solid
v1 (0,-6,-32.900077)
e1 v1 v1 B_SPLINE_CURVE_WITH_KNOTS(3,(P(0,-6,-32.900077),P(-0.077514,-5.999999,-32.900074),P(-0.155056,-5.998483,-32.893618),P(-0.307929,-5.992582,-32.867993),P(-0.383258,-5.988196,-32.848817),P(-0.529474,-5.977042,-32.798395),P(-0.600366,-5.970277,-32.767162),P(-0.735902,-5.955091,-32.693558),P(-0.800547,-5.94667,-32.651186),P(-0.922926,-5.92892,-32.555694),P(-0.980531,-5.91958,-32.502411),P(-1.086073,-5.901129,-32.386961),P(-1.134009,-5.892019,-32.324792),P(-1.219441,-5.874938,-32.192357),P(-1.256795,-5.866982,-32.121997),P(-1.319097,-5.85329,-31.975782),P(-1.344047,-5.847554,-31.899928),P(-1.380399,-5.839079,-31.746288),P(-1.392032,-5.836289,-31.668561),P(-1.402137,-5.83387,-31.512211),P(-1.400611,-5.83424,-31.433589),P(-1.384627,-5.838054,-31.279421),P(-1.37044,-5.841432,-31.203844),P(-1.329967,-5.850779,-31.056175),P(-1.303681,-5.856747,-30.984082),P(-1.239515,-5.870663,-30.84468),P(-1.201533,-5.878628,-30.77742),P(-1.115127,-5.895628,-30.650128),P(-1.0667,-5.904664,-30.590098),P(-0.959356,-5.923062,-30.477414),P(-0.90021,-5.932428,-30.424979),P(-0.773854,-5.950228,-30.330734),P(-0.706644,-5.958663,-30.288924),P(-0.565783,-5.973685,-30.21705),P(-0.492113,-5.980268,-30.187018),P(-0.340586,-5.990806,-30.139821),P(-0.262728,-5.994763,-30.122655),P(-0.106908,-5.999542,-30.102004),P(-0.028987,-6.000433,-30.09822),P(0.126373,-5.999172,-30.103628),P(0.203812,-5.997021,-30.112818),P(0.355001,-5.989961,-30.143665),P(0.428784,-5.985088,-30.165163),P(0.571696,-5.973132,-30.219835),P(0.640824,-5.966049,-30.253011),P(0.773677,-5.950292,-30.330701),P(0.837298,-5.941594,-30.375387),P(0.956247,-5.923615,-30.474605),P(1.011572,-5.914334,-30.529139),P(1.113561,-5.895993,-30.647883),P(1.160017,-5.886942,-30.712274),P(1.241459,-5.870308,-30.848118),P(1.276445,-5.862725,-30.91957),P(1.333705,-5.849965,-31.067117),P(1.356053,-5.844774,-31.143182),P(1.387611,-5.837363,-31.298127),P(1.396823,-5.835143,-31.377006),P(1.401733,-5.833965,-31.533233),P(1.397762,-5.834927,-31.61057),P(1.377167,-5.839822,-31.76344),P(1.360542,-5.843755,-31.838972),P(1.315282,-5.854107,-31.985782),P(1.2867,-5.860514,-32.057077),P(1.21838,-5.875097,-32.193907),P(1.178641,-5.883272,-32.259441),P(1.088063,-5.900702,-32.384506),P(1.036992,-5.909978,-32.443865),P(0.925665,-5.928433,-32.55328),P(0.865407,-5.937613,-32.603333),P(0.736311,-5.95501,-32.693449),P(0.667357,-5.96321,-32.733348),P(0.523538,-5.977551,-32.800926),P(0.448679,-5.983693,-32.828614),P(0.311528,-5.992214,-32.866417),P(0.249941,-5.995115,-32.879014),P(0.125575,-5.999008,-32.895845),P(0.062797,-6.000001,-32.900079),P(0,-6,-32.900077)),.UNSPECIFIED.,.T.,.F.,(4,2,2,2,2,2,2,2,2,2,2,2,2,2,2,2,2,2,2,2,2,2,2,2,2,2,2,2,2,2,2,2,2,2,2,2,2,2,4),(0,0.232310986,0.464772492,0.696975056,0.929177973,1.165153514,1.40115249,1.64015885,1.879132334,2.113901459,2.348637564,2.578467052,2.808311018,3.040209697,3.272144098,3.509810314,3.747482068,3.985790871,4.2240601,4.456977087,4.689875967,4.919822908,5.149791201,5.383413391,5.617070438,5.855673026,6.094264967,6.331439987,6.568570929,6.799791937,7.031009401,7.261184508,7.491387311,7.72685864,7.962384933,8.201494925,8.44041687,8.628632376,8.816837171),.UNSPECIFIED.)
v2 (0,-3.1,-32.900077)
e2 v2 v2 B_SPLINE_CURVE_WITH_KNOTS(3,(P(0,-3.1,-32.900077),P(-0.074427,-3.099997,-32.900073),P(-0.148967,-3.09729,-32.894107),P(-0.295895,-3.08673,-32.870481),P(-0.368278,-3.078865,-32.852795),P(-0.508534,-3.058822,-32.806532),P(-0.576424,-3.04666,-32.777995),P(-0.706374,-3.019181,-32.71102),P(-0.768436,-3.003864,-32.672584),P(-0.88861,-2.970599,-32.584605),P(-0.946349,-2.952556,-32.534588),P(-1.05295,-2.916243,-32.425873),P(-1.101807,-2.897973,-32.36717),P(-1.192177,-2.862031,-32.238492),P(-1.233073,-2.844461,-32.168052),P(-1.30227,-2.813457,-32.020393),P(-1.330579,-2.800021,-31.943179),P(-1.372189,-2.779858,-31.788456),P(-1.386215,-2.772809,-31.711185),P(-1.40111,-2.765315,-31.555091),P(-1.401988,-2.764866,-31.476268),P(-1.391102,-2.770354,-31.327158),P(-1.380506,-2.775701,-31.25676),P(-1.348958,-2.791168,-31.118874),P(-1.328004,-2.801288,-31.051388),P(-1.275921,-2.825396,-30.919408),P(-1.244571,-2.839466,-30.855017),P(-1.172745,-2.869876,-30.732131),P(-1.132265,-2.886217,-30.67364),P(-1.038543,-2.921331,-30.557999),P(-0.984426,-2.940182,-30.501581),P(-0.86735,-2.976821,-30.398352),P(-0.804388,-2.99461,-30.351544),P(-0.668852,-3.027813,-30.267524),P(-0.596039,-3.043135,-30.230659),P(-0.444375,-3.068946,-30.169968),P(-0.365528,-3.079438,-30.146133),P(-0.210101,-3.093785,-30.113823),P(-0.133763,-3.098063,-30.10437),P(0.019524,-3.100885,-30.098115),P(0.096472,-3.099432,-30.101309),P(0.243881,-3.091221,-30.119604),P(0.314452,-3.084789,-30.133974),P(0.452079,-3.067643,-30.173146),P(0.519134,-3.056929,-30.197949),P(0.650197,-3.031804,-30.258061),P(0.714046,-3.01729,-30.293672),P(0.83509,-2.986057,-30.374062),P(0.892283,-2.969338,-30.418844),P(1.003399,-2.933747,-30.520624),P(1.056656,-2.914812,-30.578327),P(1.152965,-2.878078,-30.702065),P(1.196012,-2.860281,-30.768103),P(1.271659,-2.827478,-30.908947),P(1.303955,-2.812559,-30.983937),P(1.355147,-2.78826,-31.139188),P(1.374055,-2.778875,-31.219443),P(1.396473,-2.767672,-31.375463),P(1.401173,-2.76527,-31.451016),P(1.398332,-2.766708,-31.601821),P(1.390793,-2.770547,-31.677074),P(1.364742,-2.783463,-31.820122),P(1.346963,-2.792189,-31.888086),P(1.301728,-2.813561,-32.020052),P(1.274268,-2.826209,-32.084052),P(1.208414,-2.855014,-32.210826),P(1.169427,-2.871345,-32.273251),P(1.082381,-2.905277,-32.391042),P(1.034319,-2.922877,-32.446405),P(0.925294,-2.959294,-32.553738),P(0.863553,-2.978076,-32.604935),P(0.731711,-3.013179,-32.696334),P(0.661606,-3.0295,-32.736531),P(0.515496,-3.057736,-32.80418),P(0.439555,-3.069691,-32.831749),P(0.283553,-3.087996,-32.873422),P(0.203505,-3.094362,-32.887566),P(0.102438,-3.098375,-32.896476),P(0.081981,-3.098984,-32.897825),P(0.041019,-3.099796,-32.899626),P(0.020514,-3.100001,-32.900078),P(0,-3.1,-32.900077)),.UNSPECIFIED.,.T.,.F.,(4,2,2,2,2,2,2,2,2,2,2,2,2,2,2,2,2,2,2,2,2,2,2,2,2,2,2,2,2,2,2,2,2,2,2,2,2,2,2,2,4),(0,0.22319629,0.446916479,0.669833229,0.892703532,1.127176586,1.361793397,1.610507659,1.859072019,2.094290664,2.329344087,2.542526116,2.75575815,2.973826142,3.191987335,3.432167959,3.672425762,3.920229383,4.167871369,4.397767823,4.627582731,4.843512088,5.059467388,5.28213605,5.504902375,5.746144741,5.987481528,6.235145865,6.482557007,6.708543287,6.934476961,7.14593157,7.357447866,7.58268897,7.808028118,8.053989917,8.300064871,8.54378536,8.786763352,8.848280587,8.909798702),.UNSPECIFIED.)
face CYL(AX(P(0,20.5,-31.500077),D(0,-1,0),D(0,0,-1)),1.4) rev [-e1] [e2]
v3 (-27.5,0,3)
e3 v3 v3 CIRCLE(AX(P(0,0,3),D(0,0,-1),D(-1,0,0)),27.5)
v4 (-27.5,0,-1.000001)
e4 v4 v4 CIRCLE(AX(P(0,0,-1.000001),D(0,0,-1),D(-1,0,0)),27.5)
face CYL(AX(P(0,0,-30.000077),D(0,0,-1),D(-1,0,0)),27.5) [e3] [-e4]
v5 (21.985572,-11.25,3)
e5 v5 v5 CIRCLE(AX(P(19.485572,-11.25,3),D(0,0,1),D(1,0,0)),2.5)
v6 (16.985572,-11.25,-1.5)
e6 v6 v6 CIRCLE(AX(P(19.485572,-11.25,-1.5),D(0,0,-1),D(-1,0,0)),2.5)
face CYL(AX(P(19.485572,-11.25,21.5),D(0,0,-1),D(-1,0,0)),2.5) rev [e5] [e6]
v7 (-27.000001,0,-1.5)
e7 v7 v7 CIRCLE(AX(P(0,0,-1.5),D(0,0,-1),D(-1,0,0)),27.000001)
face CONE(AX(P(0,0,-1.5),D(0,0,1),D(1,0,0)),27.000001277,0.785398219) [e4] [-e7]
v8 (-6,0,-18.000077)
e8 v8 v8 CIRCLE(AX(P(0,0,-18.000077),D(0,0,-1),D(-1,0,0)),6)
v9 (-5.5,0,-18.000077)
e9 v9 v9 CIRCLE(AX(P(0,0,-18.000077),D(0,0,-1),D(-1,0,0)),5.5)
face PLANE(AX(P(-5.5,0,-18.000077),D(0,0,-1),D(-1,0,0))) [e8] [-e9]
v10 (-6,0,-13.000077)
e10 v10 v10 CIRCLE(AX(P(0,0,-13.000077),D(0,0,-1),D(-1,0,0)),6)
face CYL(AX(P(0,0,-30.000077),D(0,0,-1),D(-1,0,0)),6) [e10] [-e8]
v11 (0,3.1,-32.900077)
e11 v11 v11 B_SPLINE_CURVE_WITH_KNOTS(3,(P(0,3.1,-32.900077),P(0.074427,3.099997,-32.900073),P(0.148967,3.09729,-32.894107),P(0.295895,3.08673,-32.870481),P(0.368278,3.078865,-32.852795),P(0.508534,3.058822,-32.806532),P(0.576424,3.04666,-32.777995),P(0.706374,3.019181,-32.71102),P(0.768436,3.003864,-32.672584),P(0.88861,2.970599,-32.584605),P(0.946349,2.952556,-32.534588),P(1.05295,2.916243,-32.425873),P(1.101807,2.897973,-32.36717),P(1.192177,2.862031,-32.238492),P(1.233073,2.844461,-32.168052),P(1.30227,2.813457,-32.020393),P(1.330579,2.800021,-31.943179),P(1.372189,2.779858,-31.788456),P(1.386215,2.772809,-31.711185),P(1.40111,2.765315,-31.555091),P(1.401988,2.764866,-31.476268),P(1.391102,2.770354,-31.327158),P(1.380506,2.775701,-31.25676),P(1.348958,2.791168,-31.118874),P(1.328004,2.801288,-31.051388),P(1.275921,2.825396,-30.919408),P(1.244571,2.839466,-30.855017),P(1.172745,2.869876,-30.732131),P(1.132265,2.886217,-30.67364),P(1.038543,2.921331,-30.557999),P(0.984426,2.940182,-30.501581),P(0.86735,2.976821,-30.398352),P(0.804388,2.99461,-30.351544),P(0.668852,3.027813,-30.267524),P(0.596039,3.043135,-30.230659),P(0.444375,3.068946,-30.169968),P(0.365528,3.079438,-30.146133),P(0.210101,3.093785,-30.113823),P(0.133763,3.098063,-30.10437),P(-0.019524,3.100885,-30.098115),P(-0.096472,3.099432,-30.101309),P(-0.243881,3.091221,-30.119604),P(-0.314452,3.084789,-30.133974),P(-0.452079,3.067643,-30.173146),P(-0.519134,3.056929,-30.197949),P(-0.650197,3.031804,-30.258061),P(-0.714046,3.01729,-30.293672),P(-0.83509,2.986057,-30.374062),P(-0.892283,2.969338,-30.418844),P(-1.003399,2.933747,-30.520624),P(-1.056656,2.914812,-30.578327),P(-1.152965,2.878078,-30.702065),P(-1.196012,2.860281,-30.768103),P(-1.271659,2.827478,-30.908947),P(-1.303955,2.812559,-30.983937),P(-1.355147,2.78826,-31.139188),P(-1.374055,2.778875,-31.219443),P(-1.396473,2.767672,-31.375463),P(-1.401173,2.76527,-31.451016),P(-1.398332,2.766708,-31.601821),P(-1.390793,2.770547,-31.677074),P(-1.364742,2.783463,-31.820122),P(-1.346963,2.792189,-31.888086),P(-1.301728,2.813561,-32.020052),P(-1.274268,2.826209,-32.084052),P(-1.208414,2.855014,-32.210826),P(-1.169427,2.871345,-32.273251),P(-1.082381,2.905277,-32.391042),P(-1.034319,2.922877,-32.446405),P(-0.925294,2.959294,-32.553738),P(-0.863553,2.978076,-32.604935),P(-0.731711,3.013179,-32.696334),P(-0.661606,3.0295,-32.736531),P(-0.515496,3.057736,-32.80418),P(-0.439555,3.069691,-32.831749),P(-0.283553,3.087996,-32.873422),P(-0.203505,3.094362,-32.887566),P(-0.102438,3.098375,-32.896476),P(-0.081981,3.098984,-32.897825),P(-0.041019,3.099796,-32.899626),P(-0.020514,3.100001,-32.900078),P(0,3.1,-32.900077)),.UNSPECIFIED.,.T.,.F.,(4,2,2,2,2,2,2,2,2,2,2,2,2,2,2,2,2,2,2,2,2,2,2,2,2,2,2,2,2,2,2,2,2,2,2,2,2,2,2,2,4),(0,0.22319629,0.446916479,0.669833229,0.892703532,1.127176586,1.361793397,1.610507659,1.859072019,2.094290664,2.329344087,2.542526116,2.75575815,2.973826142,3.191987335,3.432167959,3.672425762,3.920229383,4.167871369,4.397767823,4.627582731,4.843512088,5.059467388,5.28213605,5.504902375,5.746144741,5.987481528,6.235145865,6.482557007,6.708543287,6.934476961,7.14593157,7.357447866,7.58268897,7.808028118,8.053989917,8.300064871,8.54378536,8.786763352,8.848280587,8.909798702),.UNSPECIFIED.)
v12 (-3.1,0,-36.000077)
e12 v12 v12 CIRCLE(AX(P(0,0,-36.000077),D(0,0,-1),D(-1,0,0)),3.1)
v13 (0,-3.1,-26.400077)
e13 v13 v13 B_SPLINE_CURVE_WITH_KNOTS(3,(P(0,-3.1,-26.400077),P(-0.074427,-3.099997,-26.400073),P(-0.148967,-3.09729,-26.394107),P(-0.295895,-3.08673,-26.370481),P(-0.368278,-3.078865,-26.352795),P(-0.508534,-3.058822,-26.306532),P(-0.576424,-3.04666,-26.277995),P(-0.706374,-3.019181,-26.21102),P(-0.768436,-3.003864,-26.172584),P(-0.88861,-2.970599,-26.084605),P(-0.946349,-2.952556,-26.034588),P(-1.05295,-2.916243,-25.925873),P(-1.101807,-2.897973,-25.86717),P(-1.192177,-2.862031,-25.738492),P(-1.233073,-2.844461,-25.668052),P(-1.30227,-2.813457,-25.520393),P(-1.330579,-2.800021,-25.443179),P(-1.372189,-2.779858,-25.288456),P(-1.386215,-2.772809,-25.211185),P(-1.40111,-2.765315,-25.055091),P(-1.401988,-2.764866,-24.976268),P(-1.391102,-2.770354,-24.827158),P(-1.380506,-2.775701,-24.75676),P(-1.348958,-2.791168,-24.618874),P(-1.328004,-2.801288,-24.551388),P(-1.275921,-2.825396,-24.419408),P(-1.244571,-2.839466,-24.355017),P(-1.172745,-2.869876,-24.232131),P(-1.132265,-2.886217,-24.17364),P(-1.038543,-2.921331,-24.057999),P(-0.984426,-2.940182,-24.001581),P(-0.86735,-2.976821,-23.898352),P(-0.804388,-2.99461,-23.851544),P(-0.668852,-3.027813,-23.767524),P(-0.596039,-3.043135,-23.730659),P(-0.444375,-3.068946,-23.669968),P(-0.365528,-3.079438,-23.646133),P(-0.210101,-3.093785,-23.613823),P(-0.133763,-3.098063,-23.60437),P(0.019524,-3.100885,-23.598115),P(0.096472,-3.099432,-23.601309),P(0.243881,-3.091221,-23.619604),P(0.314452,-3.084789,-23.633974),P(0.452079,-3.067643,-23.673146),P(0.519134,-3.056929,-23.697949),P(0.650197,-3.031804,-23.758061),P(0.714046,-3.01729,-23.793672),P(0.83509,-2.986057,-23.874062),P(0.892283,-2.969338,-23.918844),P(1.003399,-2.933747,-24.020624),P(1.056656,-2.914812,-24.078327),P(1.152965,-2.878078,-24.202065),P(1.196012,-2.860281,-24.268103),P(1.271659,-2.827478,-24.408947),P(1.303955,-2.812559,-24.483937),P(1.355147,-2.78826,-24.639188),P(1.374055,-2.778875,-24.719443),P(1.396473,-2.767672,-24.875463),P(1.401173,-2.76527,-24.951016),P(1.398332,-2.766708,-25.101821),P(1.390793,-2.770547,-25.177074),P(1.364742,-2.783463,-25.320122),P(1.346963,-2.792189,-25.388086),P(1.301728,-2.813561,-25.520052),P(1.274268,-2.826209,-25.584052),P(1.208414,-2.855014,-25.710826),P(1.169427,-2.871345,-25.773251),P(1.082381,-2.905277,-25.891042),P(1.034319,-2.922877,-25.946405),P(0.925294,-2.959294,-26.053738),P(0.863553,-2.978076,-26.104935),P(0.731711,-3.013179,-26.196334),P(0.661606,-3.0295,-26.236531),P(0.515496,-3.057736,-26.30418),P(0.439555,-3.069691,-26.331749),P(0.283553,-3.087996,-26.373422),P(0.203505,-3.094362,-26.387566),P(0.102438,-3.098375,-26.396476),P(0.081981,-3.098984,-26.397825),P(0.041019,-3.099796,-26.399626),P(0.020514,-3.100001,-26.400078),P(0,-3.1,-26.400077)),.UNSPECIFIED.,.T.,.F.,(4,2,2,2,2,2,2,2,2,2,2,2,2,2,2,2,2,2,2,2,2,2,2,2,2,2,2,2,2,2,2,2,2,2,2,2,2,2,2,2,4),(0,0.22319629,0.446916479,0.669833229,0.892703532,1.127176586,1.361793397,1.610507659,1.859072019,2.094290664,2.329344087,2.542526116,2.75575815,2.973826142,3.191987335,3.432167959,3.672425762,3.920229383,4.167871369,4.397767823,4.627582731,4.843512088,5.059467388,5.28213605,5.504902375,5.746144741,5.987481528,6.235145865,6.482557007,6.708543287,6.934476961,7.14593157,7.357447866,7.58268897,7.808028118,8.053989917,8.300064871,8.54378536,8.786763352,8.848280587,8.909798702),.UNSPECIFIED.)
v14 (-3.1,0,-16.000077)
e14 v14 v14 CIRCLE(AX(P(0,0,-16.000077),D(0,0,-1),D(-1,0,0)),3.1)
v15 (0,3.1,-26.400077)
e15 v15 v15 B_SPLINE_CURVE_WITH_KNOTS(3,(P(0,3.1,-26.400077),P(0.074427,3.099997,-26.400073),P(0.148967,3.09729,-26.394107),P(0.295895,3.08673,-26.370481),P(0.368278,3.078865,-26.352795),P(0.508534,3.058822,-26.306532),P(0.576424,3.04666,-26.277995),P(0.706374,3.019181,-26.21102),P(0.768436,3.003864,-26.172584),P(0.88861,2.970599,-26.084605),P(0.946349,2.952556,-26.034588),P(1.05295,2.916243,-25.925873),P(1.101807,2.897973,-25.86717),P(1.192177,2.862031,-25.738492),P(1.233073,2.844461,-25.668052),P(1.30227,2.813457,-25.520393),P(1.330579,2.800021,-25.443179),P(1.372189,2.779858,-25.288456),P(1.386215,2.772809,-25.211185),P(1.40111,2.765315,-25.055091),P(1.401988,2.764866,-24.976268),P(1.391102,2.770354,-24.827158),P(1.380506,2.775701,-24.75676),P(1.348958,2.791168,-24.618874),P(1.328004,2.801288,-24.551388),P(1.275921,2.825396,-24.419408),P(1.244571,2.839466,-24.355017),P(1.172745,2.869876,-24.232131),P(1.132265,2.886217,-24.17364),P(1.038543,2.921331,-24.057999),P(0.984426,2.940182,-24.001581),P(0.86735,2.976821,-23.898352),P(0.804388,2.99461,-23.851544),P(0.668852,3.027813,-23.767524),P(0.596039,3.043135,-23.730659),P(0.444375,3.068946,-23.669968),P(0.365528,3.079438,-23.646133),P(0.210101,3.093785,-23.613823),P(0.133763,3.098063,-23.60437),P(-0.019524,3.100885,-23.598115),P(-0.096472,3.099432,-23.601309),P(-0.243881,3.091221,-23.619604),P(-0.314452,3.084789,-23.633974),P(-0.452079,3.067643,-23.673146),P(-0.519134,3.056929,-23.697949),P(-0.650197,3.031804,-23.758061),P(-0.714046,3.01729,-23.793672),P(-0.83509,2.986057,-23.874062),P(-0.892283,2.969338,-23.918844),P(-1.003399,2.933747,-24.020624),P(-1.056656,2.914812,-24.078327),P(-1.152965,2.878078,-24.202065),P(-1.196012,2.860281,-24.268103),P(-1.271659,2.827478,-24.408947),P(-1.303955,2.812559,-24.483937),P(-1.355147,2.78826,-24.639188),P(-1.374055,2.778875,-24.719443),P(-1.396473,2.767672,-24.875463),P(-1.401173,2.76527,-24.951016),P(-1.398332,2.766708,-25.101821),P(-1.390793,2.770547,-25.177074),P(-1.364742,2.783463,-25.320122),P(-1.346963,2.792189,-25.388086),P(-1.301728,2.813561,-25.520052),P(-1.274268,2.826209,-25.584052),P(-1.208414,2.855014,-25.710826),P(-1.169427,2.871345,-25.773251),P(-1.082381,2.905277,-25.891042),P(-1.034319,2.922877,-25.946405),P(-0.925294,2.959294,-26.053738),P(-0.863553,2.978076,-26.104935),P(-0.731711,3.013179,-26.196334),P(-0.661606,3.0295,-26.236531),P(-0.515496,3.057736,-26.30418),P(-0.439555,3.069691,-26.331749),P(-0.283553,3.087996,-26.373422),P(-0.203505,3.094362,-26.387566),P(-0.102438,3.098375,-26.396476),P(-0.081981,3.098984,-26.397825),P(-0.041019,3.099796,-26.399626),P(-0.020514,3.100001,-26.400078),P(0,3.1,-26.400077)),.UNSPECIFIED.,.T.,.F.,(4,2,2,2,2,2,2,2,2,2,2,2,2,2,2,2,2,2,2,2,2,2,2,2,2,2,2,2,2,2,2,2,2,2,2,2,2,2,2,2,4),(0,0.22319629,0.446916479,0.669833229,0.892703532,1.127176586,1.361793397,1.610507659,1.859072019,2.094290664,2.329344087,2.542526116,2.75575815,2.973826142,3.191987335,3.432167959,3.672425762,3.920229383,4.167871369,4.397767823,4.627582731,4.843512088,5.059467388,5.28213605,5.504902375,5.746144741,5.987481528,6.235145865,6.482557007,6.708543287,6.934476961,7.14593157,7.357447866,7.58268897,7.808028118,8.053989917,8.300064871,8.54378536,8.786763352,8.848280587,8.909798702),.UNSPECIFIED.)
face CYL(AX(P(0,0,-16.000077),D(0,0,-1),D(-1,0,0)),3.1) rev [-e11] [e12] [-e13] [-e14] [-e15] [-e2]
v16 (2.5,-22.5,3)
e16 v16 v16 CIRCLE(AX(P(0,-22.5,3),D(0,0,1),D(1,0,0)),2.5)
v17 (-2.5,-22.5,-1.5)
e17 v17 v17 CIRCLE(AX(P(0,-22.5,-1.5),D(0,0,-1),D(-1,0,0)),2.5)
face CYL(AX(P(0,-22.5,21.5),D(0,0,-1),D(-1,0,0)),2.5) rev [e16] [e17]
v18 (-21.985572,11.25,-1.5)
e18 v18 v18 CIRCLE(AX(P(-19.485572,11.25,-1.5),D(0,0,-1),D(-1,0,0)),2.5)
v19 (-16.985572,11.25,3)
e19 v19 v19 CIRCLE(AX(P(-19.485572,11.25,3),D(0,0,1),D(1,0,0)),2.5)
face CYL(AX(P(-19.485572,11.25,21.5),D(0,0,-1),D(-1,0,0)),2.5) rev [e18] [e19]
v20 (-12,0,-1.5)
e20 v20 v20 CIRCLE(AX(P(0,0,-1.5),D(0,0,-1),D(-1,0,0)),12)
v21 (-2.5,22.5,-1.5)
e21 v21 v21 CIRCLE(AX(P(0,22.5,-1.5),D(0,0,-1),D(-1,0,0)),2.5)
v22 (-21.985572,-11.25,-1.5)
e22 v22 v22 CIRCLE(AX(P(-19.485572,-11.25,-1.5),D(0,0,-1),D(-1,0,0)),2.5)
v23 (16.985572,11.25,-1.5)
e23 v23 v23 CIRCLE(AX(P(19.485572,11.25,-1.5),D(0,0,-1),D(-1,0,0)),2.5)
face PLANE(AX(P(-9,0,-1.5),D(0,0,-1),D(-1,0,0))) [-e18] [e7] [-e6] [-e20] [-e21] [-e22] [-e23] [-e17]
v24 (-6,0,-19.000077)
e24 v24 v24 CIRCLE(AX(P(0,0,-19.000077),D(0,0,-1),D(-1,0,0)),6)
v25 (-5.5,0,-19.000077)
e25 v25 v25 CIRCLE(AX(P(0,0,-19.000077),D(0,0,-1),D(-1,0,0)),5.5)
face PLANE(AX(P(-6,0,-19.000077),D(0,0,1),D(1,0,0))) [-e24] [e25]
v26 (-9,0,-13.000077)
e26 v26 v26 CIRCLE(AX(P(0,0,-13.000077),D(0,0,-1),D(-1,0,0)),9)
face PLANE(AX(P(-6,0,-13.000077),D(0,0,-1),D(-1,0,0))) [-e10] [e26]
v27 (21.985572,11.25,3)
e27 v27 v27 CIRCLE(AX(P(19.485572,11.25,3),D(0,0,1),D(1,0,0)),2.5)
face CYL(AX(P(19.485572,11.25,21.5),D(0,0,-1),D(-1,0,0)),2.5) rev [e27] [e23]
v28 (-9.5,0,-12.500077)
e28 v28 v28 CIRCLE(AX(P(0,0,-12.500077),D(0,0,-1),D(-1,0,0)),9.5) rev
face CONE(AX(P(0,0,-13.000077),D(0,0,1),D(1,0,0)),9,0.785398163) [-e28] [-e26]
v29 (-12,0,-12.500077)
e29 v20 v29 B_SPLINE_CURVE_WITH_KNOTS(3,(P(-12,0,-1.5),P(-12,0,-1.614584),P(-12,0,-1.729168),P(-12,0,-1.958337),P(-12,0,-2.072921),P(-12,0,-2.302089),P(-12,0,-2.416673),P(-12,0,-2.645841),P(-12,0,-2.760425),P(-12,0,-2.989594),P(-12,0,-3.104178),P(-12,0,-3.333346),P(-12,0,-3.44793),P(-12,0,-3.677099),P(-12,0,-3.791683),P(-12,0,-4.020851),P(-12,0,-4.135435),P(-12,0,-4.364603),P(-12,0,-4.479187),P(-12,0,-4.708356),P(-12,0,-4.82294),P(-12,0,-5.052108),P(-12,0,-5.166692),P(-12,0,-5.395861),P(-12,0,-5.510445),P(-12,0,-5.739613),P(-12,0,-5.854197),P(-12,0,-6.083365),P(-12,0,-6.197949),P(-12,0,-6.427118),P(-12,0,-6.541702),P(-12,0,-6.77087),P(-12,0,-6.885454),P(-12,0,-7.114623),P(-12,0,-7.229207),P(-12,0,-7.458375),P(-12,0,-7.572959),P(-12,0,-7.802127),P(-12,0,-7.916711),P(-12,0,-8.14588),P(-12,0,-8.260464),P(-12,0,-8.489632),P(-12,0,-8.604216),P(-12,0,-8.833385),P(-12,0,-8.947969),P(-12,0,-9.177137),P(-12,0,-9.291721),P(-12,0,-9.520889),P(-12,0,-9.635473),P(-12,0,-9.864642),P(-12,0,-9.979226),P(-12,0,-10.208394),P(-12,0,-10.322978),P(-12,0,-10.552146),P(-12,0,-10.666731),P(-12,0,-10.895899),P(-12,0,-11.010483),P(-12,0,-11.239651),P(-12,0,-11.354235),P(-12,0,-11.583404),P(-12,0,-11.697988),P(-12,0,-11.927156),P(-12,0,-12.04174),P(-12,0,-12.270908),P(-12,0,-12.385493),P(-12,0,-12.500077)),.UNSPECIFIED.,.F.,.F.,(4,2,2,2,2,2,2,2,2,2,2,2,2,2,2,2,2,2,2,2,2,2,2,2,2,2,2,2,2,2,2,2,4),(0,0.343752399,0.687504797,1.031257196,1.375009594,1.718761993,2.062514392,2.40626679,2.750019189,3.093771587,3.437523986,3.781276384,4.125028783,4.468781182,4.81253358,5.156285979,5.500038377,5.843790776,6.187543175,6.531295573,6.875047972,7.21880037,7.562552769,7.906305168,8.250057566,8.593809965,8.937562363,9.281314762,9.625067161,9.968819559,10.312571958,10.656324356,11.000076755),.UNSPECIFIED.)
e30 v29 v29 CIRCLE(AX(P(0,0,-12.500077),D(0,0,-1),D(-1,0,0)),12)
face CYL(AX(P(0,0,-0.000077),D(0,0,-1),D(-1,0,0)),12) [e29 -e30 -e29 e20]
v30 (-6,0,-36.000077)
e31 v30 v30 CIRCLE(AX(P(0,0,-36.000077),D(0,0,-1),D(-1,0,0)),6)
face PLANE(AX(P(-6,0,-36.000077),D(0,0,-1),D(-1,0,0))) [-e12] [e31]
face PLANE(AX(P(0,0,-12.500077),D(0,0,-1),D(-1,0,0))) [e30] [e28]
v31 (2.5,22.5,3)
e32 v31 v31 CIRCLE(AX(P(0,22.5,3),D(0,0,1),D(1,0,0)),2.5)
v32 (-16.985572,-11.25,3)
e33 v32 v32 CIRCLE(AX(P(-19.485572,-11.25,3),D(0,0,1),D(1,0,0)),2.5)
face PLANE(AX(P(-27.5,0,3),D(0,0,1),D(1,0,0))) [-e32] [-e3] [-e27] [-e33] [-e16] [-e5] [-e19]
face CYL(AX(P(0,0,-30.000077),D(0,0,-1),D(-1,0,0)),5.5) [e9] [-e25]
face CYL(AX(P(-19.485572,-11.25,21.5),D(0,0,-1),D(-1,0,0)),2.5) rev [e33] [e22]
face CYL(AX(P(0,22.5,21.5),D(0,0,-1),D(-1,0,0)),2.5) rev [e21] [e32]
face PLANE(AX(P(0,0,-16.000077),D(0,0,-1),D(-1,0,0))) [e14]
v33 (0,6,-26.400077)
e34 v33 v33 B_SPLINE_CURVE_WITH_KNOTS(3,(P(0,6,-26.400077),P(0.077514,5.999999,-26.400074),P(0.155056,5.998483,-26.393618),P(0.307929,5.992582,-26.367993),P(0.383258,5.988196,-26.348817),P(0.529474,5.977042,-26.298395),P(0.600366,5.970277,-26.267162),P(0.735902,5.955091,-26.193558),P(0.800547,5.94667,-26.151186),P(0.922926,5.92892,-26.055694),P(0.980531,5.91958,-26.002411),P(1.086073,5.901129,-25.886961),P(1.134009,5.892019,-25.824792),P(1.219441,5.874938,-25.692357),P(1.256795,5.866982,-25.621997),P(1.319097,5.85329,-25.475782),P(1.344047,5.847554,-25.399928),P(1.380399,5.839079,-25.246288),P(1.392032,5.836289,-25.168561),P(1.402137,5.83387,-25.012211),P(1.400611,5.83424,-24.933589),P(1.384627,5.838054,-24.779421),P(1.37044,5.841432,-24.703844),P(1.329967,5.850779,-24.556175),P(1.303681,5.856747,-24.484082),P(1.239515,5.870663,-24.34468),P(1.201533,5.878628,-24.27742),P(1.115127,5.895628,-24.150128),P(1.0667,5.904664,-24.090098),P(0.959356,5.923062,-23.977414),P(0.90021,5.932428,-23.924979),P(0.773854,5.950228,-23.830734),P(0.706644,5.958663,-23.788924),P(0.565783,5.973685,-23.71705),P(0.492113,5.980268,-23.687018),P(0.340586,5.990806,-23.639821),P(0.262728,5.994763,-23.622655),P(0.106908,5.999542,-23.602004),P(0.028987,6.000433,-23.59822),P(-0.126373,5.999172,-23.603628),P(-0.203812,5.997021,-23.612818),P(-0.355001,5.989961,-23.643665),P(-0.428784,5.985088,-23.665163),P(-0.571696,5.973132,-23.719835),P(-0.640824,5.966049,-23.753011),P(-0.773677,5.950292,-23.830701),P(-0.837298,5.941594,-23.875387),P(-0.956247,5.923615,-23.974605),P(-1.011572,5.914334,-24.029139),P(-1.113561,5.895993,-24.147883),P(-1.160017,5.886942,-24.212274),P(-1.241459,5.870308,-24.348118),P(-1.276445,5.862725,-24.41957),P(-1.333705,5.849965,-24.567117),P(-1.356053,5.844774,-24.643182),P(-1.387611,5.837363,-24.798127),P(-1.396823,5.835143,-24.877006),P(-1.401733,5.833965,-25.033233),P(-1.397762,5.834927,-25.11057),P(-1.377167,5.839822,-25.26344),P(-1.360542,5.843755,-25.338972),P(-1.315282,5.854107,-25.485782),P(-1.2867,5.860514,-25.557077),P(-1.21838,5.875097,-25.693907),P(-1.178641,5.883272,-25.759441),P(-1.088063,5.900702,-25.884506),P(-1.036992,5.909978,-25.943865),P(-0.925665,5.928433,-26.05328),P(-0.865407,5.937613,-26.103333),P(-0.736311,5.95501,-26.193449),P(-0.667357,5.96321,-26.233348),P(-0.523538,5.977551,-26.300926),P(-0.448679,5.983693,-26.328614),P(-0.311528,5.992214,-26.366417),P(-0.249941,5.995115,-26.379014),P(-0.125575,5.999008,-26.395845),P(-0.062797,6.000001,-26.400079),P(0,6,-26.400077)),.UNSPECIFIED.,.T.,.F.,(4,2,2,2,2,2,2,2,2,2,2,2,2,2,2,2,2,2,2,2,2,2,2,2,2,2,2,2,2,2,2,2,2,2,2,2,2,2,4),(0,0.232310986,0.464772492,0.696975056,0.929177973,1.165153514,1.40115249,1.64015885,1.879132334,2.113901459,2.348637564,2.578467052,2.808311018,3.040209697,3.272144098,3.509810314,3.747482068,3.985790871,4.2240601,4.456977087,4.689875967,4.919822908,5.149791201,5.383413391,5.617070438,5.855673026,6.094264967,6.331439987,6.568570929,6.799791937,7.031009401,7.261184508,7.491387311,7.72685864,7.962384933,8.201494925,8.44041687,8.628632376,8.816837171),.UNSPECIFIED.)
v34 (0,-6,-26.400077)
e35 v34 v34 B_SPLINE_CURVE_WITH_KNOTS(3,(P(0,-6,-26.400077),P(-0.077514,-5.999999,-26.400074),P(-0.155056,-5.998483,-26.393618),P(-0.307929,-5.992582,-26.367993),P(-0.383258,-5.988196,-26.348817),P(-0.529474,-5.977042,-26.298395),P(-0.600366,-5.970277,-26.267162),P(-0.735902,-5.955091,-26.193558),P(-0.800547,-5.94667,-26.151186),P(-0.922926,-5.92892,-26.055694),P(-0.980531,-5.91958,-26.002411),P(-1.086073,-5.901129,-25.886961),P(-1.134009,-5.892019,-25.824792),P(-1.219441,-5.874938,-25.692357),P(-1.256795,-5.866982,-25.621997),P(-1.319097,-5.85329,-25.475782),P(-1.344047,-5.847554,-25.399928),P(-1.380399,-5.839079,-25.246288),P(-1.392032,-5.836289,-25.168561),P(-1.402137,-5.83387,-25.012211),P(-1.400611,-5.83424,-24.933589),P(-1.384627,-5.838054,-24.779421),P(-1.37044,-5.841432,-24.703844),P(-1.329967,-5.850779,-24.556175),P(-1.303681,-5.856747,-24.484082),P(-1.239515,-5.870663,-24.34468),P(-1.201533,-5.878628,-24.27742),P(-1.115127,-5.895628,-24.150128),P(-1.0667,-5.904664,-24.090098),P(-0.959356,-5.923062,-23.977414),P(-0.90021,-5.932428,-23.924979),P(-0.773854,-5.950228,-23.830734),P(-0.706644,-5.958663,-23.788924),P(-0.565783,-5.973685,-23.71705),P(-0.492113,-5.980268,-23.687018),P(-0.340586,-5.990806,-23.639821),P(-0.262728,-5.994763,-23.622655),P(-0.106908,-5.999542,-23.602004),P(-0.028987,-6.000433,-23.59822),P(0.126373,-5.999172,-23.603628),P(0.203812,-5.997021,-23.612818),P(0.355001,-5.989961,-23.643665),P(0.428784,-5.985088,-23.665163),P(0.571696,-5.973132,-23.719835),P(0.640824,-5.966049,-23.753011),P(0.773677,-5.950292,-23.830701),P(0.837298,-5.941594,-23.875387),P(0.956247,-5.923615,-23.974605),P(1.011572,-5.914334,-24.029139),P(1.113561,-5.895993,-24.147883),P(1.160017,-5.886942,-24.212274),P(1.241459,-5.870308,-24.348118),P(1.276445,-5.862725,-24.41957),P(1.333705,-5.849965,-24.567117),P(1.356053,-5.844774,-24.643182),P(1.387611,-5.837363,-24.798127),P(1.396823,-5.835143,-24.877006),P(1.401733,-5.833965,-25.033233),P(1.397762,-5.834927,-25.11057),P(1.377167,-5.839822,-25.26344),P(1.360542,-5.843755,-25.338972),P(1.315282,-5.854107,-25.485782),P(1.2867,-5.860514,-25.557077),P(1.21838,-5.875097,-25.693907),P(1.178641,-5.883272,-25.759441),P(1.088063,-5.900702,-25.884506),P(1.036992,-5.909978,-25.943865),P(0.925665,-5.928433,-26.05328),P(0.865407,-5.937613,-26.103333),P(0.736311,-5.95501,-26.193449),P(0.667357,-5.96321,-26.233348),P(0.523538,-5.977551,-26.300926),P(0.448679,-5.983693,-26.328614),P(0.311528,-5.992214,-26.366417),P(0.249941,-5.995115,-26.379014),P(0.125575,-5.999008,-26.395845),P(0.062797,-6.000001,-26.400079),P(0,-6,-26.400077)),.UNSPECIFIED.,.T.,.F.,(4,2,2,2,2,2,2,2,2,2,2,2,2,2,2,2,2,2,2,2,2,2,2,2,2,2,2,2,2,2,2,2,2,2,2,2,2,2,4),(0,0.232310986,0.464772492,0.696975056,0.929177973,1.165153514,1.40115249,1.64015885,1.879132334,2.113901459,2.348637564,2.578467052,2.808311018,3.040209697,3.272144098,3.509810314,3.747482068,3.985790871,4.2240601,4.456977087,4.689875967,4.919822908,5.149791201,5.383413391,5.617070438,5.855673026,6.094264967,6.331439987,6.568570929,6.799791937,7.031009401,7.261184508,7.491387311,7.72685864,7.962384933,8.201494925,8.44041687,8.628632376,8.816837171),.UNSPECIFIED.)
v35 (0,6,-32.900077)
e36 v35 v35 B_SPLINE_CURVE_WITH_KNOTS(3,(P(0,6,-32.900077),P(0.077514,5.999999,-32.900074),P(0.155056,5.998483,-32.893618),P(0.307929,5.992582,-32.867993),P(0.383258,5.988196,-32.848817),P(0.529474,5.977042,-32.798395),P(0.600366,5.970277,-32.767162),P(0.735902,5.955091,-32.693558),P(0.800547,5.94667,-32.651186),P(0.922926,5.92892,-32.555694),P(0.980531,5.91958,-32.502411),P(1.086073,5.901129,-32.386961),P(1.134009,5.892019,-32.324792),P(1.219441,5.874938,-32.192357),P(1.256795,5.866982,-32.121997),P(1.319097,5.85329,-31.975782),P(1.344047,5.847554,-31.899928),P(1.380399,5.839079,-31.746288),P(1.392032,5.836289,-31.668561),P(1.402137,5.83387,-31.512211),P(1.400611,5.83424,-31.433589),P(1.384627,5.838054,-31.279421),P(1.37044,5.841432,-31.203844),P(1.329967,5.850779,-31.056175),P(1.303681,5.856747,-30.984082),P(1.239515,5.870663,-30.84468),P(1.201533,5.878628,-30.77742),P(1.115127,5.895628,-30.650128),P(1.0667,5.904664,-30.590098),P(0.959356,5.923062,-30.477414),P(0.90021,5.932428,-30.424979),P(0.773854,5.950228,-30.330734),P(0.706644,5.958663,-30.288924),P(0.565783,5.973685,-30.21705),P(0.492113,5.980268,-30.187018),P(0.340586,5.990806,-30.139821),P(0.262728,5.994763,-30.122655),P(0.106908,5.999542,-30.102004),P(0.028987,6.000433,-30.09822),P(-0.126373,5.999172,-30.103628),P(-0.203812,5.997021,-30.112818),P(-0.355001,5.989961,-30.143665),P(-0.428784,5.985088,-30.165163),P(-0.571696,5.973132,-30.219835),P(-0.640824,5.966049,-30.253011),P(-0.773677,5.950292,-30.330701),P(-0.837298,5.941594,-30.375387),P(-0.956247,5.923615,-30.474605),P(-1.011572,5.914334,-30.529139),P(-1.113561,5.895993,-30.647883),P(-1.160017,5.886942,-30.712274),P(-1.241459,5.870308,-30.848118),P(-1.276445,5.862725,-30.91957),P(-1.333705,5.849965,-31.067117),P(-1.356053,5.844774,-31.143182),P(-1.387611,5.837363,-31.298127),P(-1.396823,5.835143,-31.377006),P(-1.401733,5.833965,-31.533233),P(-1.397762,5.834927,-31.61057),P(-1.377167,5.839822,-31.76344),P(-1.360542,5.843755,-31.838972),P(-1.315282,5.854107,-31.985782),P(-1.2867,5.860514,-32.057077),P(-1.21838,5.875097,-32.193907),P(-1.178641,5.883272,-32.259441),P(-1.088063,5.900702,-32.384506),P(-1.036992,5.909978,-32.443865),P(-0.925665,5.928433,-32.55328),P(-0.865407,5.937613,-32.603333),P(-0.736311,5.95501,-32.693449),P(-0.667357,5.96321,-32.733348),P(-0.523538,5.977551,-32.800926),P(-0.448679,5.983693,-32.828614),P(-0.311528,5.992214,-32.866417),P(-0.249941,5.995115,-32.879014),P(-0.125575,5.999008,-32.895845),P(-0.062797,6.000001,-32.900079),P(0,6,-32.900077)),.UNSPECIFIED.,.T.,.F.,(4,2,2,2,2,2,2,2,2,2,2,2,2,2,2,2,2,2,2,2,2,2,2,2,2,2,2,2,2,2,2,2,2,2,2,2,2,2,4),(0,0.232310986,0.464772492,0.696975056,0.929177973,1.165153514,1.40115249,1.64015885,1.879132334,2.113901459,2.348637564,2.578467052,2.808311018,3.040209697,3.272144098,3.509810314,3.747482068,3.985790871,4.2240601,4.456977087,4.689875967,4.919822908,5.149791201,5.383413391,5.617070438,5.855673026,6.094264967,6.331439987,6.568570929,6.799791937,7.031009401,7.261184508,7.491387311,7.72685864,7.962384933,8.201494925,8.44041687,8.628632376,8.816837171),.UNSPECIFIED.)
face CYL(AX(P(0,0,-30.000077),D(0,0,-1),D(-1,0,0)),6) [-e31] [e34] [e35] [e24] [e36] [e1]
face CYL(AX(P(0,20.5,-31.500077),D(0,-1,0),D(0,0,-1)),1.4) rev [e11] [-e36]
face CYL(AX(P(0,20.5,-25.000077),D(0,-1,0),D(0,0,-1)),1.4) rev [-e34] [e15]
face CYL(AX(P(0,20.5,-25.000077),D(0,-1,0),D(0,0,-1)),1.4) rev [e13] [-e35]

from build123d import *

# Parameters (mm, degrees)
SKETCH_2_R               = 6.5
CUT_EXTRUDE_1_DEPTH      = 28
CHAMFER_1_SIZE           = 0.5
SKETCH_3_R               = 2.5
CUT_EXTRUDE_2_DEPTH      = 23
SKETCH_4_R               = 3.1
CUT_EXTRUDE_3_DEPTH      = 20
SKETCH_5_R               = 16.017465931
CUT_EXTRUDE_4_DEPTH      = 30.8
SKETCH_6_R               = 12
SKETCH_6_R_2             = 9
EXTRUDE_1_DEPTH          = 13
SKETCH_7_R               = 12
SKETCH_7_R_2             = 9
CUT_EXTRUDE_5_DEPTH      = 0.5
CHAMFER_2_SIZE           = 0.5
CUT_EXTRUDE_6_DEPTH      = 20.5
CUT_EXTRUDE_6_DEPTH_BACK = 30.5
SKETCH_8_R               = 1.4


with BuildPart() as part:
    # 草图1 → 旋转1 (revolve)
    with BuildSketch(Plane(origin=(0, 0, 0), x_dir=(1, 0, 0), z_dir=(0, 1, 0))):
        Polygon((-6, 20.000076755), (-6, 36.000076755), (0, 36.000076755), (0, 30.000076755), (0, -33.8), (-9.249924022, -33.8), (-9.75, -33.299919915), (-9.75, -3), (-27.5, -3), (-27.5, 1.000001333), (-27.000001277, 1.5), (-9, 1.5), (-9, 6.5), (-9, 13.000076755), (-6, 13.000076755), (-6, 18.000076755), (-5.5, 18.000076755), (-5.5, 19.000076755), (-6, 19.000076755), align=None)
    revolve(axis=Axis((0, 0, -30.000076755), (0, 0, 1)))

    # 草图2 → 切除-拉伸1 (cut)
    with BuildSketch(Plane.XY.offset(33.8)):
        Circle(SKETCH_2_R)
    extrude(amount=-CUT_EXTRUDE_1_DEPTH, mode=Mode.SUBTRACT)

    # 倒角1
    chamfer_1_edges = [part.edges().sort_by_distance(p)[0] for p in [
        (-6.5, 0, 33.8),
    ]]
    chamfer(chamfer_1_edges, length=CHAMFER_1_SIZE)

    # 草图3 → 切除-拉伸2 (cut)
    with BuildSketch(Plane(origin=(0, 0, -1.5), x_dir=(-1, 0, 0), z_dir=(0, 0, -1))):
        with Locations((0, 22.5)):
            Circle(SKETCH_3_R)
        with Locations((19.485571585, 11.25)):
            Circle(SKETCH_3_R)
        with Locations((19.485571585, -11.25)):
            Circle(SKETCH_3_R)
        with Locations((0, -22.5)):
            Circle(SKETCH_3_R)
        with Locations((-19.485571585, -11.25)):
            Circle(SKETCH_3_R)
        with Locations((-19.485571585, 11.25)):
            Circle(SKETCH_3_R)
    extrude(amount=-CUT_EXTRUDE_2_DEPTH, mode=Mode.SUBTRACT)

    # 草图4 → 切除-拉伸3 (cut)
    with BuildSketch(Plane(origin=(0, 0, -36.000076755), x_dir=(-1, 0, 0), z_dir=(0, 0, -1))):
        Circle(SKETCH_4_R)
    extrude(amount=-CUT_EXTRUDE_3_DEPTH, mode=Mode.SUBTRACT)

    # 草图5 → 切除-拉伸4 (cut)
    with BuildSketch(Plane.XY.offset(33.8)):
        Circle(SKETCH_5_R)
    extrude(amount=-CUT_EXTRUDE_4_DEPTH, mode=Mode.SUBTRACT)

    # 草图6 → 凸台-拉伸1 (add)
    with BuildSketch(Plane(origin=(0, 0, -13.000076755), x_dir=(-1, 0, 0), z_dir=(0, 0, -1))):
        Circle(SKETCH_6_R)
        Circle(SKETCH_6_R_2, mode=Mode.SUBTRACT)
    extrude(amount=-EXTRUDE_1_DEPTH)

    # 草图7 → 切除-拉伸5 (cut)
    with BuildSketch(Plane(origin=(0, 0, -13.000076755), x_dir=(-1, 0, 0), z_dir=(0, 0, -1))):
        Circle(SKETCH_7_R)
        Circle(SKETCH_7_R_2, mode=Mode.SUBTRACT)
    extrude(amount=-CUT_EXTRUDE_5_DEPTH, mode=Mode.SUBTRACT)

    # 倒角2
    chamfer_2_edges = [part.edges().sort_by_distance(p)[0] for p in [
        (9, 0, -12.500076755),
    ]]
    chamfer(chamfer_2_edges, length=CHAMFER_2_SIZE - 0.0001)  # a hair under: the kernel refuses the full size

    # 草图8 → 切除-拉伸6 (cut, two sides: drawn at the far end of the back side and taken through both)
    with BuildSketch(Plane(origin=(0, 0, 0), x_dir=(1, 0, 0), z_dir=(0, 1, 0)).offset(-CUT_EXTRUDE_6_DEPTH_BACK)):
        with Locations(Location((0, 31.500076755, 0), (0, 0, 90))):
            Circle(SKETCH_8_R)
        with Locations(Location((0, 25.000076755, 0), (0, 0, 90))):
            Circle(SKETCH_8_R)
    extrude(amount=CUT_EXTRUDE_6_DEPTH + CUT_EXTRUDE_6_DEPTH_BACK, mode=Mode.SUBTRACT)


solid = part.part
